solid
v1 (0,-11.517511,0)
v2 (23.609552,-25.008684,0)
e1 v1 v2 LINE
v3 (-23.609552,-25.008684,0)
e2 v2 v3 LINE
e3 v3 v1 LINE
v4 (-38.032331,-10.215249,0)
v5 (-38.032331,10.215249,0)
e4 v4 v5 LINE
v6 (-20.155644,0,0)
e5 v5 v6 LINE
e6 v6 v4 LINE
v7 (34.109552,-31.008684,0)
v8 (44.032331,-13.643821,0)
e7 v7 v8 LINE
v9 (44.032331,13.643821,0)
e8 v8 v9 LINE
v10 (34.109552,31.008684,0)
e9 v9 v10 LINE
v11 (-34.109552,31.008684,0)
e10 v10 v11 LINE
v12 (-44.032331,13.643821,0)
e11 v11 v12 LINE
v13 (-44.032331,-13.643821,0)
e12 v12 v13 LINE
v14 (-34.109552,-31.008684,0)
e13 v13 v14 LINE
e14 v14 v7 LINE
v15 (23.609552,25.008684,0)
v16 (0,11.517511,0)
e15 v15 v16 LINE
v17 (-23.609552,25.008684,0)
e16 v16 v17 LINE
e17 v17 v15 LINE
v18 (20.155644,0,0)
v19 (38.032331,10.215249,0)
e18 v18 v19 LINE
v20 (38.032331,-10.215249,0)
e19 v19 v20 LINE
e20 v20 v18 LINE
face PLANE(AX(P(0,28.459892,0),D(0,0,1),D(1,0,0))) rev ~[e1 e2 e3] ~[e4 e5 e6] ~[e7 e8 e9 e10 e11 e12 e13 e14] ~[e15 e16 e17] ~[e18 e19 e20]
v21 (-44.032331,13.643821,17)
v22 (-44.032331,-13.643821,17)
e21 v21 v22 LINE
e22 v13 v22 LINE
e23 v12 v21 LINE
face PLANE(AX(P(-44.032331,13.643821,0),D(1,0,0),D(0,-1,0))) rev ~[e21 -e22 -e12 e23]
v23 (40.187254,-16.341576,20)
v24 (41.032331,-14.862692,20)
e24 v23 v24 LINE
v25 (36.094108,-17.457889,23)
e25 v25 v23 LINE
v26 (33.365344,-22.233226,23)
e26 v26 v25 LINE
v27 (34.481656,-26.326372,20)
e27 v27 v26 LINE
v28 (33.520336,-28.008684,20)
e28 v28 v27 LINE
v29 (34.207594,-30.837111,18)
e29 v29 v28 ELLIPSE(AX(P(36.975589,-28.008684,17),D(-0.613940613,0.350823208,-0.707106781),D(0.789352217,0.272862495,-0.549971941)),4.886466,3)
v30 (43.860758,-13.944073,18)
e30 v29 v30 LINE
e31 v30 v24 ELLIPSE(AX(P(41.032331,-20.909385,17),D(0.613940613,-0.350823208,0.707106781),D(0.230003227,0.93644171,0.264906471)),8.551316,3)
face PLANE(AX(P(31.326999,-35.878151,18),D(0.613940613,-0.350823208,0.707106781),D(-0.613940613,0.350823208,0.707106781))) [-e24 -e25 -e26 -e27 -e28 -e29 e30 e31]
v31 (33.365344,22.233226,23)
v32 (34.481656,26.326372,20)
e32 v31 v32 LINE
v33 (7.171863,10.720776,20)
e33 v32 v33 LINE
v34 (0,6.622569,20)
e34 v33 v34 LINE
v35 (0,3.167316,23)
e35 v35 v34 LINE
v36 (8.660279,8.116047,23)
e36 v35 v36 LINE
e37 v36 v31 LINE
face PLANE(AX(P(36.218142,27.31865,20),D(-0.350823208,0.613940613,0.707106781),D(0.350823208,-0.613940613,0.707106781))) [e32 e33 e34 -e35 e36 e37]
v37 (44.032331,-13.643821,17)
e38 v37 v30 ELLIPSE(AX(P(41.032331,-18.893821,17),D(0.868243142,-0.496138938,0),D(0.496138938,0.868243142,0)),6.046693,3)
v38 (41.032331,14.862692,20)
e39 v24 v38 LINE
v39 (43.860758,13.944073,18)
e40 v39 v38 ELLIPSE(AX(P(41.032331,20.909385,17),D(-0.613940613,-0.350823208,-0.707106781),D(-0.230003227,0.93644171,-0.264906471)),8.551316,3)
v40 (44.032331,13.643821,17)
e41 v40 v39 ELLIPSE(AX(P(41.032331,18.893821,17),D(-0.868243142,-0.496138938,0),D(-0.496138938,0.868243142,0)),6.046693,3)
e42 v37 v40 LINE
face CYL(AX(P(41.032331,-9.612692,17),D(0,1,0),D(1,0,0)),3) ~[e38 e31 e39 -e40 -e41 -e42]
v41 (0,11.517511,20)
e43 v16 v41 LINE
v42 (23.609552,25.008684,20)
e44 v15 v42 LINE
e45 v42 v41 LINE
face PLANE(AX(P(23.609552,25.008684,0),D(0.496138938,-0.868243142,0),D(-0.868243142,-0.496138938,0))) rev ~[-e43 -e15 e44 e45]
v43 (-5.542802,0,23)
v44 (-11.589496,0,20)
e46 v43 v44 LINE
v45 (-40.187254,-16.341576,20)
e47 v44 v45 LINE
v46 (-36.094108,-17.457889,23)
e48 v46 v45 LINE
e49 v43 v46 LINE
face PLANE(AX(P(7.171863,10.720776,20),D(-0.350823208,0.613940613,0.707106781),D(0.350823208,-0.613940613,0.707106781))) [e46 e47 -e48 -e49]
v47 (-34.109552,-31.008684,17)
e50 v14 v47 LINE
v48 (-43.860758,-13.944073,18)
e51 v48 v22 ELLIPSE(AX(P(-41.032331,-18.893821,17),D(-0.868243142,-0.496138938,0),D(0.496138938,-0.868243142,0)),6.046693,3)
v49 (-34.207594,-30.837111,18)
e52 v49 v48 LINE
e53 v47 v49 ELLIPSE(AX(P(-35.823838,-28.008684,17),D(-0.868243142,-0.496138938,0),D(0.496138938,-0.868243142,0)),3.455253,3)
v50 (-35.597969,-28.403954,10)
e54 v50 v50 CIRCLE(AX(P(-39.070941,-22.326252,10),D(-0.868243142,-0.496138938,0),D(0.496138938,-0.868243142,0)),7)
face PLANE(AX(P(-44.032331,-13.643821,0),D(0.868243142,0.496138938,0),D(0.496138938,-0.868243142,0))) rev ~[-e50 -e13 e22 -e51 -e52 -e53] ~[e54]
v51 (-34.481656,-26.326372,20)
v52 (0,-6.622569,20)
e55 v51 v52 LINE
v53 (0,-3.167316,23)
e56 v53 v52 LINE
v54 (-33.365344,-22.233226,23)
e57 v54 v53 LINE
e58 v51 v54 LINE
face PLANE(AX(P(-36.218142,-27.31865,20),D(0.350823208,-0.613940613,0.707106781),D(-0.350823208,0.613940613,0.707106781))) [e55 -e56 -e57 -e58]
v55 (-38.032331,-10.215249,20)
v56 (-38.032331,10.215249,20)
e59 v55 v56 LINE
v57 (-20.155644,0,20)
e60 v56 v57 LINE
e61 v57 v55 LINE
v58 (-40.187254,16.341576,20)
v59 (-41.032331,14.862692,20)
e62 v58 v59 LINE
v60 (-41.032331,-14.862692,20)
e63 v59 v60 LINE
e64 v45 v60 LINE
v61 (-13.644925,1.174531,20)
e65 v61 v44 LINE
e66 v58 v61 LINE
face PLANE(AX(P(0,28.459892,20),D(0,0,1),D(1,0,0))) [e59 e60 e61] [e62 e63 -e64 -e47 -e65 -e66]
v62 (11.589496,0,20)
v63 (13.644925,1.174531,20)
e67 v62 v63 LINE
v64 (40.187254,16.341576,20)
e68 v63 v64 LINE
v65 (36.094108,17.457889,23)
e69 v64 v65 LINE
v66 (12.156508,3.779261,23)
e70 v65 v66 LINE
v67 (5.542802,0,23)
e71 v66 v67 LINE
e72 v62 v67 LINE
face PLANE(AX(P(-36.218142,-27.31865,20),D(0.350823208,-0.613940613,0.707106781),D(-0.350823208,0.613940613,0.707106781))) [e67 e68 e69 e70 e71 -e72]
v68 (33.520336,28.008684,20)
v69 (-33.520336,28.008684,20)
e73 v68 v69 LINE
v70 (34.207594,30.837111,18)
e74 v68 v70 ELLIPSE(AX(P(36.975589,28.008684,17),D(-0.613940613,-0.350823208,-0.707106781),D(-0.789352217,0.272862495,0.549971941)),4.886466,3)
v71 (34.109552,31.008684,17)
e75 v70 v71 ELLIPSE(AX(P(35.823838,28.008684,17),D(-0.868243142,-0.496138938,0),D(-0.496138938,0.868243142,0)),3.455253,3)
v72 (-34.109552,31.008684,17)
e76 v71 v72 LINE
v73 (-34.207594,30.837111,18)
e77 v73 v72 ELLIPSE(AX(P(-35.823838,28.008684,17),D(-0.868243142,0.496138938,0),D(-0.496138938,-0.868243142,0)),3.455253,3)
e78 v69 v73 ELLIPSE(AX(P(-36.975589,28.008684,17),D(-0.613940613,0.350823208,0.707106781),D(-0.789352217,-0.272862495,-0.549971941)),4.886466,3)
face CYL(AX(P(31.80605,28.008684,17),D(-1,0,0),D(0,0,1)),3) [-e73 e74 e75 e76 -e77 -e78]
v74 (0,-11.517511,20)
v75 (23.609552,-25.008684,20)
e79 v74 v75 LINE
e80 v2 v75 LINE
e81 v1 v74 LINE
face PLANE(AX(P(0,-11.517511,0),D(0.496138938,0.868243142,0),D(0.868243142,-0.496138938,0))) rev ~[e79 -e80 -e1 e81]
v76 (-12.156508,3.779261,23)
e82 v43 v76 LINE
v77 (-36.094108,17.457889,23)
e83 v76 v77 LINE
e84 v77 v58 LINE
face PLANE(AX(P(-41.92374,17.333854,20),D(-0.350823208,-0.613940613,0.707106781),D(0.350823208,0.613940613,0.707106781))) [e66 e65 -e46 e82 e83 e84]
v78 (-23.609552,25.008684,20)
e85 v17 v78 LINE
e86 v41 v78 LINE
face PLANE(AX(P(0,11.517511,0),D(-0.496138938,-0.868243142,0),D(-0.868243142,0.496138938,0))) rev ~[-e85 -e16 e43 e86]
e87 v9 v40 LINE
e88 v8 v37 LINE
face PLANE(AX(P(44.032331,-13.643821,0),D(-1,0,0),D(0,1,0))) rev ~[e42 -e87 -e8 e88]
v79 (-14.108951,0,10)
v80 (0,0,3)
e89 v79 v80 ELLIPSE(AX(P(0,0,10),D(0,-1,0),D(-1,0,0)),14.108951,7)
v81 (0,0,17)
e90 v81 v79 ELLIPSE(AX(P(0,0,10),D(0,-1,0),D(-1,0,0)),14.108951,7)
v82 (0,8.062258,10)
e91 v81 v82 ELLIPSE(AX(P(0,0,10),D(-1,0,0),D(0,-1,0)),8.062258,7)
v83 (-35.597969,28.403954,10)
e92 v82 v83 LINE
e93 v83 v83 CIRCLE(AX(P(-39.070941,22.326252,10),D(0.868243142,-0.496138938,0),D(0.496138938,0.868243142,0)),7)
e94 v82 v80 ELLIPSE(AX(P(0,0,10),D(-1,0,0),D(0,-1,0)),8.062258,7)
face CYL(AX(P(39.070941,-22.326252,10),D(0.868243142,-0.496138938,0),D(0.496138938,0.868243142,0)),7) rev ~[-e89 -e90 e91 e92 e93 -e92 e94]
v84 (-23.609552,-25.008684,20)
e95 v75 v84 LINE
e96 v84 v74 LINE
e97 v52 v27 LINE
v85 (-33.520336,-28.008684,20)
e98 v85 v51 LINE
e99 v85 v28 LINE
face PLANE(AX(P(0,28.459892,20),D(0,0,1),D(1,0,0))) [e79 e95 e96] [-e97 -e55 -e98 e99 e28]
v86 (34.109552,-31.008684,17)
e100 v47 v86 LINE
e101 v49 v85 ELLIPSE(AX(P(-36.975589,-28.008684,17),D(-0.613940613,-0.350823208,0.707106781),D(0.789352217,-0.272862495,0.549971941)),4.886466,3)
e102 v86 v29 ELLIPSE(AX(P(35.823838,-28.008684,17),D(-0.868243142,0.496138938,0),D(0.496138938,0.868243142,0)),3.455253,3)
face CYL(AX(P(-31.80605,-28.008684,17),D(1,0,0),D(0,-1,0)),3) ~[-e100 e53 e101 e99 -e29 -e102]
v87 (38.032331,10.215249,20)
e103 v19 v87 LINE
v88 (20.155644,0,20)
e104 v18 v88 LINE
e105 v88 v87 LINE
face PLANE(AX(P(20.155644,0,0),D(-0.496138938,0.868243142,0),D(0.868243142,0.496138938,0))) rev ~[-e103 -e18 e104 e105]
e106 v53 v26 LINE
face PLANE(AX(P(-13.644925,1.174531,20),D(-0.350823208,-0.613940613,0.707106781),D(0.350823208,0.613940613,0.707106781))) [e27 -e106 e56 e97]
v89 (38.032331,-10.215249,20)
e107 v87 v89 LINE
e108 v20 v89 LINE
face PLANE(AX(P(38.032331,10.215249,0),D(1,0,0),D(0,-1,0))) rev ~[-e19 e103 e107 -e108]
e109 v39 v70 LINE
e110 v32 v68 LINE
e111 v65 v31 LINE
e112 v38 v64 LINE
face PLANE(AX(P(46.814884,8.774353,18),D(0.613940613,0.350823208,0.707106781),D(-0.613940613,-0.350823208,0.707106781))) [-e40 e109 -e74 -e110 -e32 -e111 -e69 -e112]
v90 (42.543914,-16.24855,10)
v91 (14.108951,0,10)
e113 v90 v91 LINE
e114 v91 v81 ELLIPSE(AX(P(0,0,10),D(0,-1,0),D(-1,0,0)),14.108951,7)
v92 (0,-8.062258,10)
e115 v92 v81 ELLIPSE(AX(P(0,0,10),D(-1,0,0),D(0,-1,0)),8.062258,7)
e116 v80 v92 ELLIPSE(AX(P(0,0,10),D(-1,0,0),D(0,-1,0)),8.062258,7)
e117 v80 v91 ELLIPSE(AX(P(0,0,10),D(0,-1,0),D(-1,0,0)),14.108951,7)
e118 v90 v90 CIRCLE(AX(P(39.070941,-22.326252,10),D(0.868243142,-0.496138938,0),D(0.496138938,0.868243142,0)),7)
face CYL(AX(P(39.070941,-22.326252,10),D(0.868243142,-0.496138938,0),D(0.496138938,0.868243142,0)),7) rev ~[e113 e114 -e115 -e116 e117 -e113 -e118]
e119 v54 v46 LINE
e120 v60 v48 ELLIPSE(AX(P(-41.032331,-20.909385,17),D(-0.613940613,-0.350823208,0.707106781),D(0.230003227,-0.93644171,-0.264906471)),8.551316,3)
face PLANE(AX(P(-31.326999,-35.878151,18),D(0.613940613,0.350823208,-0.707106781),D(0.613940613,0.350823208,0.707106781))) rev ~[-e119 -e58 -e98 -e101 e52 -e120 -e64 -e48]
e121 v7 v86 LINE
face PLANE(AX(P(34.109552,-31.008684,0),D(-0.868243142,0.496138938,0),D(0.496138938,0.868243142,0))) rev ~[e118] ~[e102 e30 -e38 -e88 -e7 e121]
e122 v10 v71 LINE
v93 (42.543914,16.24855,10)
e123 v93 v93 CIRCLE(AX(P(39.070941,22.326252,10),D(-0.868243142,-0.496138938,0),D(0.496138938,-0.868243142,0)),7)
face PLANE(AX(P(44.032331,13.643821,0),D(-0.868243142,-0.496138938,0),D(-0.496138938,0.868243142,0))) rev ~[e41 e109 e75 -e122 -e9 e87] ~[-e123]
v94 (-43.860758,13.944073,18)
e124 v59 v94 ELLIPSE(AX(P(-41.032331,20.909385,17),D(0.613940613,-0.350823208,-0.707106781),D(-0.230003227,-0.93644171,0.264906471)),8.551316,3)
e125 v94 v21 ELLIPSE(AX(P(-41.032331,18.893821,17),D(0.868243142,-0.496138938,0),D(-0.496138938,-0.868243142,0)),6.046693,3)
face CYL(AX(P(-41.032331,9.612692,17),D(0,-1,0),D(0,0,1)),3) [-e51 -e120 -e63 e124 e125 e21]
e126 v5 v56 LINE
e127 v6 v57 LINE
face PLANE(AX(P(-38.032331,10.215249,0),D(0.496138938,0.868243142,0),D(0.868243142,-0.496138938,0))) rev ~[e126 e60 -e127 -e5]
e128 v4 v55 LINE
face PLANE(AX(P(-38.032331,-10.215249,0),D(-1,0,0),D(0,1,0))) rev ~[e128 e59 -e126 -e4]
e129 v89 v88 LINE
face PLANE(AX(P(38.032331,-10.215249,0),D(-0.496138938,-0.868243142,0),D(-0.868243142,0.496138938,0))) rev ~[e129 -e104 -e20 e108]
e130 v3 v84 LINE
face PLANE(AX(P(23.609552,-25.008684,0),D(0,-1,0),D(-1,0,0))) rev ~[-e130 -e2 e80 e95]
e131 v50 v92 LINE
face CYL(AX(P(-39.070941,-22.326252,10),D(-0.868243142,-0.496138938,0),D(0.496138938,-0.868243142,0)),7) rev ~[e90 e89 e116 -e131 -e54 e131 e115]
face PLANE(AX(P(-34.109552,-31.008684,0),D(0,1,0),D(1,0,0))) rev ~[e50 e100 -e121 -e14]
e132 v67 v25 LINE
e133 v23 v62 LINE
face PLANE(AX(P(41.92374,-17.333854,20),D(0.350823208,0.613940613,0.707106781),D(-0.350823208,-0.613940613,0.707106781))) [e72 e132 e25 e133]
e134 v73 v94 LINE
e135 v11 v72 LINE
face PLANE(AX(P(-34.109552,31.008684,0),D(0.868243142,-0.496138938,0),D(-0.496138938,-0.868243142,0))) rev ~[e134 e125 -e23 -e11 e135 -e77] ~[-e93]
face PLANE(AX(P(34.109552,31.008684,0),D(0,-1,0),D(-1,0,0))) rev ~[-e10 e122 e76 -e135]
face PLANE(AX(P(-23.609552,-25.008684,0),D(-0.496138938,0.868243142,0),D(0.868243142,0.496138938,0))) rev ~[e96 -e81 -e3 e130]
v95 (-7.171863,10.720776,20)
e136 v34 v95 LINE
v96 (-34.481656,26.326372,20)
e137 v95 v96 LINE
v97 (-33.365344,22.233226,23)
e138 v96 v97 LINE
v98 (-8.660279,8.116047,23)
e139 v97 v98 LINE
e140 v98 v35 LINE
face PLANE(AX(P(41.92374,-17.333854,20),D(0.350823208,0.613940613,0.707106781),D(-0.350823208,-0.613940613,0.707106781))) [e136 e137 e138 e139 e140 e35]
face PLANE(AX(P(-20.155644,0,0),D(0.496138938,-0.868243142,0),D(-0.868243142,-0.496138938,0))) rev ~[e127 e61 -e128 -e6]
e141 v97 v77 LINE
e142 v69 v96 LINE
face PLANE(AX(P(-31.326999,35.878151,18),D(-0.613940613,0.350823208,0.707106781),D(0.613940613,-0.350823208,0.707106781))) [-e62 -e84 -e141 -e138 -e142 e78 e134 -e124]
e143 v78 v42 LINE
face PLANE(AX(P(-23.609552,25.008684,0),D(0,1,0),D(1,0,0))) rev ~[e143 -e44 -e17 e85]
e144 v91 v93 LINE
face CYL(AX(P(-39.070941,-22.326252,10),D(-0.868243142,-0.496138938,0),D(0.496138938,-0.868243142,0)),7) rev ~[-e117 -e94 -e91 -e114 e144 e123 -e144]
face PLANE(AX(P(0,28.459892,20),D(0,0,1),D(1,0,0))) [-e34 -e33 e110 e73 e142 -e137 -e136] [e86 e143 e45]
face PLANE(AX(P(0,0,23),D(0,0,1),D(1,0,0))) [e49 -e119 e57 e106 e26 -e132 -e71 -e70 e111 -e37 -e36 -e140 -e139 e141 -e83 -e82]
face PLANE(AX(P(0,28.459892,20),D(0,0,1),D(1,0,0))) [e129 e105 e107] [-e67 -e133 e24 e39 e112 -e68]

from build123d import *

# Parameters (mm, degrees)
F1_DEPTH      = 20
F2_R          = 7
F3_DEPTH      = 98.6163846154
F3_DEPTH_BACK = 8.6163846154
F4_R          = 7
F5_DEPTH      = 98.6163846154
F5_DEPTH_BACK = 8.6163846154
F7_DEPTH      = 3
F8_T4_DEPTH   = 57.4298435113
F8_T9_DEPTH   = 57.4298435113
F8_T14_DEPTH  = 56.5459149398
F8_T19_DEPTH  = 56.5459149398
F8_T24_DEPTH  = 56.5459149398
F8_T29_DEPTH  = 56.5459149398
F8_T34_DEPTH  = 57.4298435113
F8_T39_DEPTH  = 57.4298435113
F9_T1_DEPTH   = 31.2168298797
F9_T3_DEPTH   = 31.2168298797
F9_T5_DEPTH   = 31.2168298797
F10_R         = 3


# Not quite as in the source:
# - a fillet or chamfer that OpenCascade refuses, or shapes differently, is made with other operations: its cross-section is extruded or revolved along the edge and cut away or added


with BuildPart() as f1:
    # F0 (on Top) → F1 (new body)
    with BuildSketch(Plane.XY):
        Polygon((-23.609552012, 25.0086836473), (0, 25.0086836473), (23.609552012, 25.0086836473), (34.109552012, 31.0086836473), (-34.109552012, 31.0086836473), align=None)
        Polygon((0, 11.517511069), (-23.609552012, 25.0086836473), (-34.109552012, 31.0086836473), (-44.0323307792, 13.6438208048), (-38.0323307792, 10.2152493762), (-20.1556443707, 0), align=None)
        Polygon((34.109552012, 31.0086836473), (23.609552012, 25.0086836473), (0, 11.517511069), (20.1556443707, 0), (38.0323307792, 10.2152493762), (44.0323307792, 13.6438208048), align=None)
        Polygon((-38.0323307792, 10.2152493762), (-44.0323307792, 13.6438208048), (-44.0323307792, -13.6438208048), (-38.0323307792, -10.2152493762), (-38.0323307792, 0), align=None)
        Polygon((0, -11.517511069), (-20.1556443707, 0), (-38.0323307792, -10.2152493762), (-44.0323307792, -13.6438208048), (-34.109552012, -31.0086836473), (-23.609552012, -25.0086836473), align=None)
        Polygon((38.0323307792, -10.2152493762), (20.1556443707, 0), (0, -11.517511069), (23.609552012, -25.0086836473), (34.109552012, -31.0086836473), (44.0323307792, -13.6438208048), align=None)
        Polygon((44.0323307792, -13.6438208048), (44.0323307792, 13.6438208048), (38.0323307792, 10.2152493762), (38.0323307792, 0), (38.0323307792, -10.2152493762), align=None)
        Polygon((-23.609552012, -25.0086836473), (-34.109552012, -31.0086836473), (34.109552012, -31.0086836473), (23.609552012, -25.0086836473), (0, -25.0086836473), align=None)
        Polygon((20.1556443707, 0), (0, 11.517511069), (-20.1556443707, 0), (0, -11.517511069), align=None)
    extrude(amount=F1_DEPTH)

    # F2 (on face) → F3 (cut, two sides)
    with BuildSketch(Plane(origin=(-39.0709413956, -22.3262522261, 0), x_dir=(0.4961389384, -0.8682431421, 0), z_dir=(-0.8682431421, -0.4961389384, 0))) as f3_sk:
        with Locations((0, 10)):
            Circle(F2_R)
    extrude(amount=-F3_DEPTH, mode=Mode.SUBTRACT)
    extrude(f3_sk.sketch, amount=F3_DEPTH_BACK, mode=Mode.SUBTRACT)

    # F4 (on face) → F5 (cut, two sides)
    with BuildSketch(Plane(origin=(39.0709413956, -22.3262522261, 0), x_dir=(0.4961389384, 0.8682431421, 0), z_dir=(0.8682431421, -0.4961389384, 0))) as f5_sk:
        with Locations((0, 10)):
            Circle(F4_R)
    extrude(amount=-F5_DEPTH, mode=Mode.SUBTRACT)
    extrude(f5_sk.sketch, amount=F5_DEPTH_BACK, mode=Mode.SUBTRACT)

    # F6 (on face) → F7 (join)
    with BuildSketch(Plane.XY.offset(20)):
        Polygon((0, 0.8638133302), (-38.6988371918, 22.9774345827), (-39.0709413956, 22.3262522261), (-39.4430455994, 21.6750698695), (-1.5116733278, 0), align=None)
        Polygon((38.6988371918, 22.9774345827), (0, 0.8638133302), (1.5116733278, 0), (39.4430455994, 21.6750698695), (39.0709413956, 22.3262522261), align=None)
        Polygon((1.5116733278, 0), (0, 0.8638133302), (-1.5116733278, 0), (0, -0.8638133302), align=None)
        Polygon((39.4430455994, -21.6750698695), (1.5116733278, 0), (0, -0.8638133302), (38.6988371918, -22.9774345827), (39.0709413956, -22.3262522261), align=None)
        Polygon((0, -0.8638133302), (-1.5116733278, 0), (-39.4430455994, -21.6750698695), (-39.0709413956, -22.3262522261), (-38.6988371918, -22.9774345827), align=None)
    extrude(amount=F7_DEPTH)

    # F8: chamfer of 5 on 8 edges, made by hand


with BuildPart() as f8_tool2:
    # F8_s3 → F8_t4 (new body)
    with BuildSketch(Plane(origin=(-39.0709413956, -22.3262522261, 0), x_dir=(0, 0, 1), z_dir=(0.8682431421, 0.4961389384, 0))):
        Polygon((20, 5.75), (25, 0.75), (20, 0.75), align=None)
    extrude(amount=F8_T4_DEPTH)

    split(bisect_by=Plane.XY.offset(23), keep=Keep.BOTTOM)


with BuildPart() as f1_1:
    add(f1.part)

    # F8_t1: union F8_tool2
    add(f8_tool2.part)


with BuildPart() as f8_tool7:
    # F8_s8 → F8_t9 (new body)
    with BuildSketch(Plane(origin=(-10.7921263863, 6.1669293636, 0), x_dir=(0, 0, 1), z_dir=(0.8682431421, -0.4961389384, 0))):
        Polygon((20, 5.75), (25, 0.75), (20, 0.75), align=None)
    extrude(amount=F8_T9_DEPTH)

    split(bisect_by=Plane.XY.offset(23), keep=Keep.BOTTOM)


with BuildPart() as f1_2:
    add(f1_1.part)

    # F8_t6: union F8_tool7
    add(f8_tool7.part)


with BuildPart() as f8_tool12:
    # F8_s13 → F8_t14 (new body)
    with BuildSketch(Plane(origin=(10.0246614661, 5.7283779806, 0), x_dir=(0, 0, 1), z_dir=(-0.8682431421, -0.4961389384, 0))):
        Polygon((20, 5.75), (25, 0.75), (20, 0.75), align=None)
    extrude(amount=F8_T14_DEPTH)

    split(bisect_by=Plane.XY.offset(23), keep=Keep.BOTTOM)


with BuildPart() as f1_3:
    add(f1_2.part)

    # F8_t11: union F8_tool12
    add(f8_tool12.part)


with BuildPart() as f8_tool17:
    # F8_s18 → F8_t19 (new body)
    with BuildSketch(Plane(origin=(-39.0709413956, 22.3262522261, 0), x_dir=(0, 0, 1), z_dir=(0.8682431421, -0.4961389384, 0))):
        Polygon((20, 5.75), (25, 0.75), (20, 0.75), align=None)
    extrude(amount=F8_T19_DEPTH)

    split(bisect_by=Plane.XY.offset(23), keep=Keep.BOTTOM)


with BuildPart() as f1_4:
    add(f1_3.part)

    # F8_t16: union F8_tool17
    add(f8_tool17.part)


with BuildPart() as f8_tool22:
    # F8_s23 → F8_t24 (new body)
    with BuildSketch(Plane(origin=(39.0709413956, -22.3262522261, 0), x_dir=(0, 0, 1), z_dir=(-0.8682431421, 0.4961389384, 0))):
        Polygon((20, 5.75), (25, 0.75), (20, 0.75), align=None)
    extrude(amount=F8_T24_DEPTH)

    split(bisect_by=Plane.XY.offset(23), keep=Keep.BOTTOM)


with BuildPart() as f1_5:
    add(f1_4.part)

    # F8_t21: union F8_tool22
    add(f8_tool22.part)


with BuildPart() as f8_tool27:
    # F8_s28 → F8_t29 (new body)
    with BuildSketch(Plane(origin=(-10.0246614661, -5.7283779806, 0), x_dir=(0, 0, 1), z_dir=(0.8682431421, 0.4961389384, 0))):
        Polygon((20, 5.75), (25, 0.75), (20, 0.75), align=None)
    extrude(amount=F8_T29_DEPTH)

    split(bisect_by=Plane.XY.offset(23), keep=Keep.BOTTOM)


with BuildPart() as f1_6:
    add(f1_5.part)

    # F8_t26: union F8_tool27
    add(f8_tool27.part)


with BuildPart() as f8_tool32:
    # F8_s33 → F8_t34 (new body)
    with BuildSketch(Plane(origin=(10.7921263863, -6.1669293636, 0), x_dir=(0, 0, 1), z_dir=(-0.8682431421, 0.4961389384, 0))):
        Polygon((20, 5.75), (25, 0.75), (20, 0.75), align=None)
    extrude(amount=F8_T34_DEPTH)

    split(bisect_by=Plane.XY.offset(23), keep=Keep.BOTTOM)


with BuildPart() as f1_7:
    add(f1_6.part)

    # F8_t31: union F8_tool32
    add(f8_tool32.part)


with BuildPart() as f8_tool37:
    # F8_s38 → F8_t39 (new body)
    with BuildSketch(Plane(origin=(39.0709413956, 22.3262522261, 0), x_dir=(0, 0, 1), z_dir=(-0.8682431421, -0.4961389384, 0))):
        Polygon((20, 5.75), (25, 0.75), (20, 0.75), align=None)
    extrude(amount=F8_T39_DEPTH)

    split(bisect_by=Plane.XY.offset(23), keep=Keep.BOTTOM)


with BuildPart() as f1_8:
    add(f1_7.part)

    # F8_t36: union F8_tool37
    add(f8_tool37.part)

    # F9: chamfer of 5 on 4 edges, made by hand

    # F9_s2 → F9_t1 (cut)
    with BuildSketch(Plane(origin=(7.7439424177, -13.5518992309, 0), x_dir=(0, 0, 1), z_dir=(-0.4961389384, 0.8682431421, 0))):
        Polygon((18, -45), (23, -40), (23, -45), align=None)
        Polygon((18, 45), (23, 40), (23, 45), align=None)
    extrude(amount=F9_T1_DEPTH, mode=Mode.SUBTRACT)

    # F9_s4 → F9_t3 (cut)
    with BuildSketch(Plane(origin=(7.7439424177, 13.5518992309, 0), x_dir=(0, 0, 1), z_dir=(-0.4961389384, -0.8682431421, 0))):
        Polygon((18, 45), (23, 40), (23, 45), align=None)
    extrude(amount=F9_T3_DEPTH, mode=Mode.SUBTRACT)

    # F9_s6 → F9_t5 (cut)
    with BuildSketch(Plane(origin=(-7.7439424177, -13.5518992309, 0), x_dir=(0, 0, 1), z_dir=(0.4961389384, 0.8682431421, 0))):
        Polygon((18, 45), (23, 40), (23, 45), align=None)
    extrude(amount=F9_T5_DEPTH, mode=Mode.SUBTRACT)

    # F10
    f10_edges = [f1_8.edges().sort_by_distance(p)[0] for p in [
        (0, 31.008684, 20),
        (0, -31.008684, 20),
        (-44.032331, 0, 20),
        (44.032331, 0, 20),
    ]]
    fillet(f10_edges, radius=F10_R)


solid = f1_8.part
